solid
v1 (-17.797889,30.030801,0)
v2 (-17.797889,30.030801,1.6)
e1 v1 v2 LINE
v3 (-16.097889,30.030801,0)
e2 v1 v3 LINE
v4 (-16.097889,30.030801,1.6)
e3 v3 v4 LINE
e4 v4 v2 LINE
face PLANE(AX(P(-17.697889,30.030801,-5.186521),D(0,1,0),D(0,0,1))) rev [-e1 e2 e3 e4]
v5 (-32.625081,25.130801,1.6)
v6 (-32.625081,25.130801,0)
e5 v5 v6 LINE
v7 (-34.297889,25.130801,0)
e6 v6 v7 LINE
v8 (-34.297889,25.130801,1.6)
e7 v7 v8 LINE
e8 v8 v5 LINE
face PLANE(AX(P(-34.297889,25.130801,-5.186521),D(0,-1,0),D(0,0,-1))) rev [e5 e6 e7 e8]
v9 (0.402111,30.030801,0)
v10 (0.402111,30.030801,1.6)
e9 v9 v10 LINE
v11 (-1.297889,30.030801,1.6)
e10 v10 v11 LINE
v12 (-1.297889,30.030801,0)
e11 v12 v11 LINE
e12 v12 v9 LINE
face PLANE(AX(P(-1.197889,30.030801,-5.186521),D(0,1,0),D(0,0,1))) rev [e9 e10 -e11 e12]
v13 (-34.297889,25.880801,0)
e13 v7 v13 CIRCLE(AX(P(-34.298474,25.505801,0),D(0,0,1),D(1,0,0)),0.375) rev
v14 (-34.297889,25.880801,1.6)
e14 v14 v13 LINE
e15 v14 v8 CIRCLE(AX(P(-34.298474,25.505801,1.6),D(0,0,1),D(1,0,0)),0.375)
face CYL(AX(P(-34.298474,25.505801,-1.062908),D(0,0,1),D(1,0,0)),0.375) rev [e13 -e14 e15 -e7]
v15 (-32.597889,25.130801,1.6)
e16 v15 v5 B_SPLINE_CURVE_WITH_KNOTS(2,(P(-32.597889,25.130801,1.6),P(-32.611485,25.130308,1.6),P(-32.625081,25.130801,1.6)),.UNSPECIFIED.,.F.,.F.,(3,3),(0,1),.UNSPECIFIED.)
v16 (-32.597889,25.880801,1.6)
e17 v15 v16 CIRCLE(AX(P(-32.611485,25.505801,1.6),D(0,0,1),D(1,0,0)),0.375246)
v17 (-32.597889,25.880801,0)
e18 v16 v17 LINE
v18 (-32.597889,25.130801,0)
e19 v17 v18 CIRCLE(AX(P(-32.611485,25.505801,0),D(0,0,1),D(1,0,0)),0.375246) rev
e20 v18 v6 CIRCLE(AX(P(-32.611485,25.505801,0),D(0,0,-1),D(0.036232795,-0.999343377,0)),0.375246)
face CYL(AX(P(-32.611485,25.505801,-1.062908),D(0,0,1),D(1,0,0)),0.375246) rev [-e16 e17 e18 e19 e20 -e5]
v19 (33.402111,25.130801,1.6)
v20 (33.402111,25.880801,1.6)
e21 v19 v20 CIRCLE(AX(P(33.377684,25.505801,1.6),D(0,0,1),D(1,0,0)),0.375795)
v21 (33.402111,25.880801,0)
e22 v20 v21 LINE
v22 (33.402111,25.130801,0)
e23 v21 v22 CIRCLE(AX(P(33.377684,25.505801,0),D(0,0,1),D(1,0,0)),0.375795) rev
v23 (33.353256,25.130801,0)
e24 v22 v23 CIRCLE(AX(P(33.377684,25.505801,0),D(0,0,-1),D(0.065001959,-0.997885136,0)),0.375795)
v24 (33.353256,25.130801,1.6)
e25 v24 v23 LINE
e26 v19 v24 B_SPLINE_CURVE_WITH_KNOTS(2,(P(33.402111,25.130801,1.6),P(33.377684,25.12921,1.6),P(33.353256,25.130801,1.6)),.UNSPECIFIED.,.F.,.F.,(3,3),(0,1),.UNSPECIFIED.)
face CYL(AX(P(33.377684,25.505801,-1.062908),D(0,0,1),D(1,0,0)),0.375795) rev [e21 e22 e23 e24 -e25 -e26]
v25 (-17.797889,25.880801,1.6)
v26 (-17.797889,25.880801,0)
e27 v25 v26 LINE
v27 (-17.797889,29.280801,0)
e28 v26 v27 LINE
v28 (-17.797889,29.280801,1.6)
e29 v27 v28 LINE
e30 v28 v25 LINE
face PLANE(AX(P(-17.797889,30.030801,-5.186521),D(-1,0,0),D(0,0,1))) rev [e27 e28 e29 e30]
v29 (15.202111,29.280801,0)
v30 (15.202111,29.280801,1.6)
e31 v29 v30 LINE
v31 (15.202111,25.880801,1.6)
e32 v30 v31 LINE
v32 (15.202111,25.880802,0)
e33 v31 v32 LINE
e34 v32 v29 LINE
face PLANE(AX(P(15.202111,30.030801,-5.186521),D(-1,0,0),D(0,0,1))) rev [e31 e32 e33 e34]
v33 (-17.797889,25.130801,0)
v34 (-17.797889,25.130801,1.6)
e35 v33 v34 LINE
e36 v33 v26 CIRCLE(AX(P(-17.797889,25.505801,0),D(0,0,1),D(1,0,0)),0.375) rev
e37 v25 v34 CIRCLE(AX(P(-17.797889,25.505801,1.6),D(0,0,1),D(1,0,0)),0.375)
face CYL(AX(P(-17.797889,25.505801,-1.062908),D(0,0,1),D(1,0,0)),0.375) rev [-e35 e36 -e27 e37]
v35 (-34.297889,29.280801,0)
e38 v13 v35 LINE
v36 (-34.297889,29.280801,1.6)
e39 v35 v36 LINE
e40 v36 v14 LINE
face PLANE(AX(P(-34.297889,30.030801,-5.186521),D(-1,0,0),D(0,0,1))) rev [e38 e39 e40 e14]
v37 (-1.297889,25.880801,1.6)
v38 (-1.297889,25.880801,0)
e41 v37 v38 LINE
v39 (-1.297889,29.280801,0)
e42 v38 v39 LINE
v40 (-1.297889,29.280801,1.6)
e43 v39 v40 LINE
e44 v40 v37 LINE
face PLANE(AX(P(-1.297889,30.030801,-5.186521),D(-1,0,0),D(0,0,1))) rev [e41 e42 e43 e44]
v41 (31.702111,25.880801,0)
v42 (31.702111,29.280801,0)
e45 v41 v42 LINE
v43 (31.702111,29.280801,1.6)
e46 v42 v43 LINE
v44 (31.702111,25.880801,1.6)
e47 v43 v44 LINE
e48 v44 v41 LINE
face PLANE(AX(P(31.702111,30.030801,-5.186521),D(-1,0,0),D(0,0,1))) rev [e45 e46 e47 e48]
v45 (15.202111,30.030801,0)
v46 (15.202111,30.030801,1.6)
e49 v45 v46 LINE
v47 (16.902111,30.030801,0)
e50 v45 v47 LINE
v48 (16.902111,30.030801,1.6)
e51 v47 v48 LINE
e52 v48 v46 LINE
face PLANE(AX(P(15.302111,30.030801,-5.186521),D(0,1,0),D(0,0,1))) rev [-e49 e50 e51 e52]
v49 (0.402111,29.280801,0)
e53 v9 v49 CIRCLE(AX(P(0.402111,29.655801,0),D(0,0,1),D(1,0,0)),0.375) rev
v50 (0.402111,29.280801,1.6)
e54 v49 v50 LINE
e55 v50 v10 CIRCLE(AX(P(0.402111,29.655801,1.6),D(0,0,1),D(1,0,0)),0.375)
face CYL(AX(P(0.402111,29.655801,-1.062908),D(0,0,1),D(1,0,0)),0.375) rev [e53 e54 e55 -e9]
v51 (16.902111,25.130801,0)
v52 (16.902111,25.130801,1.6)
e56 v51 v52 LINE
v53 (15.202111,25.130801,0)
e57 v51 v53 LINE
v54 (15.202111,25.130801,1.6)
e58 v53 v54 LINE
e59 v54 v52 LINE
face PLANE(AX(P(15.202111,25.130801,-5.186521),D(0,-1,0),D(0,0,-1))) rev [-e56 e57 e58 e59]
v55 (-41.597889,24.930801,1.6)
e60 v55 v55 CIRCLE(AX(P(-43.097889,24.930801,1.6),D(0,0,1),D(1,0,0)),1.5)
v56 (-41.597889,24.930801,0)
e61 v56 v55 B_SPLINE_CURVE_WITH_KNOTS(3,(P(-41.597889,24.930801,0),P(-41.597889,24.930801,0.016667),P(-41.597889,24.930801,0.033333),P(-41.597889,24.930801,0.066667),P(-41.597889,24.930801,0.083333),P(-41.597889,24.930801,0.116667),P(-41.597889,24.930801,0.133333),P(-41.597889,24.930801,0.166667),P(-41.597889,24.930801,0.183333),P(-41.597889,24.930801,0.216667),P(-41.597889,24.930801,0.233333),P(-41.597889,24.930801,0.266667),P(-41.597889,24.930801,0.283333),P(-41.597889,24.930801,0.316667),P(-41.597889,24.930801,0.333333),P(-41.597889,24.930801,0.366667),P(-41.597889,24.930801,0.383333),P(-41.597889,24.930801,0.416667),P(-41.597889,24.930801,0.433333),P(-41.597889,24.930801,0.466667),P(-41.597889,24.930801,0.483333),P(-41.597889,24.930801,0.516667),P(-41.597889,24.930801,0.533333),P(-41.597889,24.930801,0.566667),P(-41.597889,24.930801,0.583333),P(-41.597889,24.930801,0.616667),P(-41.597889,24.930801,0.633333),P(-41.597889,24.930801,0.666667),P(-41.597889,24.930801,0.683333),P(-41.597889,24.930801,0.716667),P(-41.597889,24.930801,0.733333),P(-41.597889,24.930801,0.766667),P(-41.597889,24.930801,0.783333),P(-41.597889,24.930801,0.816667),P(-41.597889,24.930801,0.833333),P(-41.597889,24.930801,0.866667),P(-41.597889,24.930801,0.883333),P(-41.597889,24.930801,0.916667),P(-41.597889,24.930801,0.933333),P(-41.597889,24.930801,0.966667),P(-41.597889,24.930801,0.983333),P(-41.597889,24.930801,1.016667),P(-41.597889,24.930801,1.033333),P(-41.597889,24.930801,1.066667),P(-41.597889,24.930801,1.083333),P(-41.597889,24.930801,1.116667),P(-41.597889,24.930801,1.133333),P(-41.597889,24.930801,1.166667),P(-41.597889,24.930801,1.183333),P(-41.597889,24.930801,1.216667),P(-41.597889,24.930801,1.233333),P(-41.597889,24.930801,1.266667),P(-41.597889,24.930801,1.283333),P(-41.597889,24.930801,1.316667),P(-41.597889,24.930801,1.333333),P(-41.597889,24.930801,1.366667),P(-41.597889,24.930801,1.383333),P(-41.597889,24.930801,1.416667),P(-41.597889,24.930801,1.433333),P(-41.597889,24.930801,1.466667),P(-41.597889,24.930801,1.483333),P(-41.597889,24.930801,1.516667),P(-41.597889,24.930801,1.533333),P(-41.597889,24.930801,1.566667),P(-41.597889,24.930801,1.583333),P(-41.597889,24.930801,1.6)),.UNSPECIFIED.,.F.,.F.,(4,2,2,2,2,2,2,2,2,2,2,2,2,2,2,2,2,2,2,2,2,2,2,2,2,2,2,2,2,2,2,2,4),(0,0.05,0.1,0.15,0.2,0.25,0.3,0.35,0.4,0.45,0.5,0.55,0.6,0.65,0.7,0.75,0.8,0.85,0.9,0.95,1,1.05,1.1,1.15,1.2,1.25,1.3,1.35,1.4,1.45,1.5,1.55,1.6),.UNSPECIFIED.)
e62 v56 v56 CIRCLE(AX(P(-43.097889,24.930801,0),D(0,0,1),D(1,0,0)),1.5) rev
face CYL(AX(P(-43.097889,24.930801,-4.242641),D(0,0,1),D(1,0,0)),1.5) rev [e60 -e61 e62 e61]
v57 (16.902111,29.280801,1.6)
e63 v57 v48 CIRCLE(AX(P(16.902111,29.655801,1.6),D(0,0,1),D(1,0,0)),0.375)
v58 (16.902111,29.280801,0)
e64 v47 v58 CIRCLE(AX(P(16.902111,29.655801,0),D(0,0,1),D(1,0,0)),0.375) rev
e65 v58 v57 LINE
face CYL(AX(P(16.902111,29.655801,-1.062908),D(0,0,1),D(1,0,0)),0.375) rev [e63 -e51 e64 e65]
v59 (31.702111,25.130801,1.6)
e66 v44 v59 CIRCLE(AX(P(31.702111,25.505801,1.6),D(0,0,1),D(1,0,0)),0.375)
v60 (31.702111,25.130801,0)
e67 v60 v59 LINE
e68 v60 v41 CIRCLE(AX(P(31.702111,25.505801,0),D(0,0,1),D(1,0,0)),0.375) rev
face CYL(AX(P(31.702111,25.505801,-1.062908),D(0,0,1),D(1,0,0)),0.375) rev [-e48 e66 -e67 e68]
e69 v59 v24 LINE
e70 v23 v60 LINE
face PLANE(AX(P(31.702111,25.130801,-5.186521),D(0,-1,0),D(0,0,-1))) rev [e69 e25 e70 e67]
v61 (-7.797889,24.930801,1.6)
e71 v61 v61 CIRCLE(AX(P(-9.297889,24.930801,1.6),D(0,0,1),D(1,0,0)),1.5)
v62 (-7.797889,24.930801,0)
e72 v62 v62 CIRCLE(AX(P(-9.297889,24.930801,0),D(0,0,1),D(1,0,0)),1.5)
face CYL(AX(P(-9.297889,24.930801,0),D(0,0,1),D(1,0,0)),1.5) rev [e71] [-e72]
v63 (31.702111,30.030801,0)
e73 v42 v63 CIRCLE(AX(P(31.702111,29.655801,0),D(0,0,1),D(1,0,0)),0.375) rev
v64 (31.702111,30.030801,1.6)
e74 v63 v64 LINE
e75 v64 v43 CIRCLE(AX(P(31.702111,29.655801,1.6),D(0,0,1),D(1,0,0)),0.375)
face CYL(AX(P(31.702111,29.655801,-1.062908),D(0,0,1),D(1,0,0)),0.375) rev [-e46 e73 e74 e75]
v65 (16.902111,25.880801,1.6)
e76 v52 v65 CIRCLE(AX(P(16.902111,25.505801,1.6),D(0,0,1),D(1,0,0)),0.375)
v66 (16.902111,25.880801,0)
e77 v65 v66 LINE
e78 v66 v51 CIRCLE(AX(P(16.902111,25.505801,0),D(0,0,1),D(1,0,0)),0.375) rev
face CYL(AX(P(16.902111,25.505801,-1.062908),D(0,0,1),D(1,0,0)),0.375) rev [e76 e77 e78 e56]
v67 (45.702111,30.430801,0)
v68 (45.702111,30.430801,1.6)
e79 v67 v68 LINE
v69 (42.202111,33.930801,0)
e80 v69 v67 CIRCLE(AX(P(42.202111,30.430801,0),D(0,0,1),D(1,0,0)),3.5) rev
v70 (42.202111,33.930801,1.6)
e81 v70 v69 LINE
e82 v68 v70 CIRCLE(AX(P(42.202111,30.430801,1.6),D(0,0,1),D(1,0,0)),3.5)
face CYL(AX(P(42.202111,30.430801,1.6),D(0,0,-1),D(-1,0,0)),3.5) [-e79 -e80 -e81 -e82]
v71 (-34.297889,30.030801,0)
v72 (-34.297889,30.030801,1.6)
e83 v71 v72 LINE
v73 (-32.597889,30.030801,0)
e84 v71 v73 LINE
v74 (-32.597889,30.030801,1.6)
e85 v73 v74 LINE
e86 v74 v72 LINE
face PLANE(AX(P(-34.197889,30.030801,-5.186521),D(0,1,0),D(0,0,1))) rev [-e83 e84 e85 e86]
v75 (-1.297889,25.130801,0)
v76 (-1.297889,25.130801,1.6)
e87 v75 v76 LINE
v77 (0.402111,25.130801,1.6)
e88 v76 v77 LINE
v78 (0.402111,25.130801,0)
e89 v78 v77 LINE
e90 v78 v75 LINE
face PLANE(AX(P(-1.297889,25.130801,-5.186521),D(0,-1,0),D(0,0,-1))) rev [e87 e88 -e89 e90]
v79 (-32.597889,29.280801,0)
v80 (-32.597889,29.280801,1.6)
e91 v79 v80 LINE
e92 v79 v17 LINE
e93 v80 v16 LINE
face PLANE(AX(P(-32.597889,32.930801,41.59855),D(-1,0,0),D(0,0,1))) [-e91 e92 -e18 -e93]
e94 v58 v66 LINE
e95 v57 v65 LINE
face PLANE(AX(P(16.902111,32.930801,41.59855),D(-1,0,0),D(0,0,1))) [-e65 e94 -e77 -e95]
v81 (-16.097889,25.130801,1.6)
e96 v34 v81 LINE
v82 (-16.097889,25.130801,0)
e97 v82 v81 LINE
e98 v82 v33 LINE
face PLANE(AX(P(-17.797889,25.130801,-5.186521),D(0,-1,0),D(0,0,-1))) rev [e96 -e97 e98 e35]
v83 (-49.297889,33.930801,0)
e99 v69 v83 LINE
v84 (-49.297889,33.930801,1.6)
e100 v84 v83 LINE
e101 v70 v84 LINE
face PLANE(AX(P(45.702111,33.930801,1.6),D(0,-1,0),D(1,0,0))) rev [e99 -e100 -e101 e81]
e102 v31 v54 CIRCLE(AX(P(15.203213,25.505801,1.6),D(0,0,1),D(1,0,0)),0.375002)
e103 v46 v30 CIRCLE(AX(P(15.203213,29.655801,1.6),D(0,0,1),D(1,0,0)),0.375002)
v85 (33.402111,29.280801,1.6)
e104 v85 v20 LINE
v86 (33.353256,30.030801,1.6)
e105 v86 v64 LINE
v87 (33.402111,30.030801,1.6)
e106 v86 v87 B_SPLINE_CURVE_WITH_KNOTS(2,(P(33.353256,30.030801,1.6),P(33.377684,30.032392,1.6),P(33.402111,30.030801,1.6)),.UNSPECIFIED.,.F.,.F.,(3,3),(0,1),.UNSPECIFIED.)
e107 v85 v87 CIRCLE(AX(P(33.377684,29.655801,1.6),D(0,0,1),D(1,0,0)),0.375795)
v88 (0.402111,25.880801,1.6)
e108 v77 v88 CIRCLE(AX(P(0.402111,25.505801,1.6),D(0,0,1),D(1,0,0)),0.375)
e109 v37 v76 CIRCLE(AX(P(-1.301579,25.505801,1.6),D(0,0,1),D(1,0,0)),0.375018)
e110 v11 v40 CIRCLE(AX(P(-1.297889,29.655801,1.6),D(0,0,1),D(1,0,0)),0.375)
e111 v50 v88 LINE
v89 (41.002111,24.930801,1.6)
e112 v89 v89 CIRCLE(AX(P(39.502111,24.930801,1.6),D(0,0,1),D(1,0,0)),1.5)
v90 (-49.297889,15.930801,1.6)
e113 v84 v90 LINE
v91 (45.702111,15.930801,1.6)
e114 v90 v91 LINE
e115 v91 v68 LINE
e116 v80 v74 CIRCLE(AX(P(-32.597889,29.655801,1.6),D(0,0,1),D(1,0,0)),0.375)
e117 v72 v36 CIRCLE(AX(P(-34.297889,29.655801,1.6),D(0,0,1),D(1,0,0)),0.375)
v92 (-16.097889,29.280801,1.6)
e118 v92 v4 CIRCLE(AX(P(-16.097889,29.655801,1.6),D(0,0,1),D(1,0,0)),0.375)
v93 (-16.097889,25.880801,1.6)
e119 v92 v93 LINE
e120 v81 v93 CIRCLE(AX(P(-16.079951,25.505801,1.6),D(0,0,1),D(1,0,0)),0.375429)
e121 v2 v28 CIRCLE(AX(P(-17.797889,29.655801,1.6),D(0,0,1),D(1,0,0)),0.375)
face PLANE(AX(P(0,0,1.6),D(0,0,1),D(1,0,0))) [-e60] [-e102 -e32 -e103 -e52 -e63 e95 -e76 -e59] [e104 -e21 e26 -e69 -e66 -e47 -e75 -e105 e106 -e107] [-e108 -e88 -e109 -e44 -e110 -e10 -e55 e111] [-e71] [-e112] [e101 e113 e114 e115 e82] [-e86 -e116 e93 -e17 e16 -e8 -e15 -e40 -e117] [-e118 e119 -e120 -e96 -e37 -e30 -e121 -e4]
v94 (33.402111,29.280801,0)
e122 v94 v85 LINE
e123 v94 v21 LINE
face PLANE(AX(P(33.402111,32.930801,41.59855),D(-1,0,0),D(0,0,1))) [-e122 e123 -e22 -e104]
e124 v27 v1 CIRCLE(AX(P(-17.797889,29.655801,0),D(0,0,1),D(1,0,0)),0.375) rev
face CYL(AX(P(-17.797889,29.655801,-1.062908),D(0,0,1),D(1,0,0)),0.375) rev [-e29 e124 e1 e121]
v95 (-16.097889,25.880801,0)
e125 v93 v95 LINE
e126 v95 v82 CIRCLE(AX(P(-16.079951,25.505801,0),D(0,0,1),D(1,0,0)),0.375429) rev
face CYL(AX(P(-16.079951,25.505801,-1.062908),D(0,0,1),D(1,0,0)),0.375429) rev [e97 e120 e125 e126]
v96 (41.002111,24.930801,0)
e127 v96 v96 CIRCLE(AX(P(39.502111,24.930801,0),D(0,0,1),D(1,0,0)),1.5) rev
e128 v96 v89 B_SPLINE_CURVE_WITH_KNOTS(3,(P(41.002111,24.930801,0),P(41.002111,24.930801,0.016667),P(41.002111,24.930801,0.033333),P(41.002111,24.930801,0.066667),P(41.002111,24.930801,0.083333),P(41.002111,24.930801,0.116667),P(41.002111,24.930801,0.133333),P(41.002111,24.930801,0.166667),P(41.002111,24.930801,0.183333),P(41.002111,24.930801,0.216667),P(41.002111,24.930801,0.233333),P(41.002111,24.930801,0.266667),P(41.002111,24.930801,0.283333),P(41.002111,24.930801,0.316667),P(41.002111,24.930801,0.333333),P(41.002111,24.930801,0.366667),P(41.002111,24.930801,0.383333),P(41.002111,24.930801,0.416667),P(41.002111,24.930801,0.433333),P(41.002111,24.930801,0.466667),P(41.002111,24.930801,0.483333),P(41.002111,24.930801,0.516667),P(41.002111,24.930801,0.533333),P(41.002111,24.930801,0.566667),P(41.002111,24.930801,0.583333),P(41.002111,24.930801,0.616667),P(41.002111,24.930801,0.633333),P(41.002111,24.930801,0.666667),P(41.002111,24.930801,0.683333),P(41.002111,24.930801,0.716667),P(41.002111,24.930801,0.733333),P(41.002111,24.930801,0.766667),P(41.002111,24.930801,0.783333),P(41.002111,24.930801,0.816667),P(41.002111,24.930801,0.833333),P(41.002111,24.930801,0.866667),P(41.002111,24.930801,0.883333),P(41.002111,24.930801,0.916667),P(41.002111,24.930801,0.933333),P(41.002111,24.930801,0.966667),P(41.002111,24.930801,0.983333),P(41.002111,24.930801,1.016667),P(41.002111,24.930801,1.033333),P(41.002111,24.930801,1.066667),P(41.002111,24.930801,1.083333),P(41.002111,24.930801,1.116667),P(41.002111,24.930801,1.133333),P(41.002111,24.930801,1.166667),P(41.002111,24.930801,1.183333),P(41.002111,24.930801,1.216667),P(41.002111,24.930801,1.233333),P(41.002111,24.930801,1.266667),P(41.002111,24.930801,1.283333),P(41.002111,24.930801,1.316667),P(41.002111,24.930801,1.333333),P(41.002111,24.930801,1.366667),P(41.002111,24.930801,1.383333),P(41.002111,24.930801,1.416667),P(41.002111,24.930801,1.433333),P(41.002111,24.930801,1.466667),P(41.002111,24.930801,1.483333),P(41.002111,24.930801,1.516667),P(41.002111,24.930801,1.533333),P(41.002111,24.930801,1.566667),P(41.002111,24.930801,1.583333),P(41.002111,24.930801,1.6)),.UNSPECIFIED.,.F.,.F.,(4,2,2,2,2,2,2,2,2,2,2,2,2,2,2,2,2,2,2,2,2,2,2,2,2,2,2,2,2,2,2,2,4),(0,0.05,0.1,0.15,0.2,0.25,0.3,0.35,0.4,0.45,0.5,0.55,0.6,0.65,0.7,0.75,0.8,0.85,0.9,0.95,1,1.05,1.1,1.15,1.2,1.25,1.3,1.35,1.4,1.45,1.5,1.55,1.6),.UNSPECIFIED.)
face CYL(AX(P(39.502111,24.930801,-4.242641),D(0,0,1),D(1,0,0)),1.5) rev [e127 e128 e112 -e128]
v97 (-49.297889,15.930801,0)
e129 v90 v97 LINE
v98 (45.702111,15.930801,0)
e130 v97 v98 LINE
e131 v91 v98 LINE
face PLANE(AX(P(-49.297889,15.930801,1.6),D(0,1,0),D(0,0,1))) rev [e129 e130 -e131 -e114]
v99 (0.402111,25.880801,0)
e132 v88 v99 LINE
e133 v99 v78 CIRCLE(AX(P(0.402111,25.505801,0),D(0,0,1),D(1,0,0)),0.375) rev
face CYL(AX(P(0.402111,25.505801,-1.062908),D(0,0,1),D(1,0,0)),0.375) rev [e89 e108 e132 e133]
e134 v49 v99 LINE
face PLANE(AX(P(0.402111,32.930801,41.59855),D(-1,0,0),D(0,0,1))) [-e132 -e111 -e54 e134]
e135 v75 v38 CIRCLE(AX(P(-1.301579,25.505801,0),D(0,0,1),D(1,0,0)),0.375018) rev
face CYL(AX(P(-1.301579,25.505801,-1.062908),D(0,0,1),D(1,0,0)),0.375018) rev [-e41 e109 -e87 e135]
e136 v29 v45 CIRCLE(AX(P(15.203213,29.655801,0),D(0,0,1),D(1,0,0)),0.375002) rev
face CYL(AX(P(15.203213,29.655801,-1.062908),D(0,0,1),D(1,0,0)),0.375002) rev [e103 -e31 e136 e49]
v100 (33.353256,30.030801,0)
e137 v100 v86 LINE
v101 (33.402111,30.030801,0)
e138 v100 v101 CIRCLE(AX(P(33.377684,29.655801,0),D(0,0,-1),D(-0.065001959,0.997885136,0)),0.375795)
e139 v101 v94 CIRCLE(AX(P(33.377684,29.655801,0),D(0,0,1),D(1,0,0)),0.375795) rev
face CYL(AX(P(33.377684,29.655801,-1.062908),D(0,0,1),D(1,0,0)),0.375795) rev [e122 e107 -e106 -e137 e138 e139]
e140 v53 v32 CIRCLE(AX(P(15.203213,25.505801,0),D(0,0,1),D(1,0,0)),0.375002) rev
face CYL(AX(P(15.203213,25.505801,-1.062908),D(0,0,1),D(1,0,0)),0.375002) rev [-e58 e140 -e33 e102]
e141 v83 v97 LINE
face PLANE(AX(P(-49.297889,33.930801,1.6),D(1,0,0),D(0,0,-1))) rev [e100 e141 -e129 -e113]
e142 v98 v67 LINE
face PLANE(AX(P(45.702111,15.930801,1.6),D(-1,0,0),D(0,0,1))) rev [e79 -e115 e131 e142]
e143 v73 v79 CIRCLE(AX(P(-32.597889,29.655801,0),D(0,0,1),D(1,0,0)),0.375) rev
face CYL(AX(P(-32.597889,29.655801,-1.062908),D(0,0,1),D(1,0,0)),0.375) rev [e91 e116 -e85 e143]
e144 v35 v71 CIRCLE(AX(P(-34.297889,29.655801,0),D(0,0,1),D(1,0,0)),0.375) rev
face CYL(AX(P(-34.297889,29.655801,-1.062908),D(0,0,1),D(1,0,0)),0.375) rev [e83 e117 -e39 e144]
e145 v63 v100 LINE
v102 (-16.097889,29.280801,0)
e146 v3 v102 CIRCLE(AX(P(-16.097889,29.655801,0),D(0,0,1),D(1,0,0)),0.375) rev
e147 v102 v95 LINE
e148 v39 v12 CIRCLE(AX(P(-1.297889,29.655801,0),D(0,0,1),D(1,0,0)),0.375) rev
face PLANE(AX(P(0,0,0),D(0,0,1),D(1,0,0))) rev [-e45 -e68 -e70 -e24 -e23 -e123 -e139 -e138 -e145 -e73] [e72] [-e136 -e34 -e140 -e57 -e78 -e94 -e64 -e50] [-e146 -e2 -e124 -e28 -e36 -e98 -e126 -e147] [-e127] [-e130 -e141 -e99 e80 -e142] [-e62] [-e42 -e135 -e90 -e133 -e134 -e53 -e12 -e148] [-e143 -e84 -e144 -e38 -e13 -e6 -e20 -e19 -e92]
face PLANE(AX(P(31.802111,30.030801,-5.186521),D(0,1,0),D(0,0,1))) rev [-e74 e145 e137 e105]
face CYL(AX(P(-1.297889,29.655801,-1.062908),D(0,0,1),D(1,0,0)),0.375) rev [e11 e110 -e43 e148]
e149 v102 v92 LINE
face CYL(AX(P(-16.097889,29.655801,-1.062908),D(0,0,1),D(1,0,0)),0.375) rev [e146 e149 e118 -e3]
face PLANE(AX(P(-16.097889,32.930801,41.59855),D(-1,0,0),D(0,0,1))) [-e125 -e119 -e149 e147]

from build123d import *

# Parameters (mm, degrees)
SZKIC1_W                    = 95
SZKIC1_H                    = 18
DODANIE_WYCI_GNI_CIE1_DEPTH = 1.6
GNIAZDO1_START              = -34.197888829
GNIAZDO1_OUTLINE_W          = 4.7
GNIAZDO1_OUTLINE_H          = 1.6
GNIAZDO1_DEPTH              = 1.6
GNIAZDO1_START_2            = -17.697888829
GNIAZDO1_2_OUTLINE_W        = 4.7
GNIAZDO1_2_OUTLINE_H        = 1.6
GNIAZDO1_2_DEPTH            = 1.6
GNIAZDO1_START_3            = -1.197888829
GNIAZDO1_3_OUTLINE_W        = 4.7
GNIAZDO1_3_OUTLINE_H        = 1.6
GNIAZDO1_3_DEPTH            = 1.6
GNIAZDO1_START_4            = 15.302111171
GNIAZDO1_4_OUTLINE_W        = 4.7
GNIAZDO1_4_OUTLINE_H        = 1.6
GNIAZDO1_4_DEPTH            = 1.6
GNIAZDO1_START_5            = 31.802111171
GNIAZDO1_5_OUTLINE_W        = 4.7
GNIAZDO1_5_OUTLINE_H        = 1.6
GNIAZDO1_5_DEPTH            = 1.6
WYTNIJ_WYCI_GNI_CIE2_DEPTH  = 1.6
ZAOKR_GLENIE1_R             = 3.5
SZKIC37_R                   = 1.5
WYTNIJ_WYCI_GNI_CIE3_DEPTH  = 1.6
SZKIC38_R                   = 1.5
WYTNIJ_WYCI_GNI_CIE4_DEPTH  = 60.867696542
SZKIC39_R                   = 0.375000457
SZKIC39_R_2                 = 0.375246396
SZKIC39_R_3                 = 0.375
SZKIC39_R_4                 = 0.375428794
SZKIC39_R_5                 = 0.37501816
SZKIC39_R_6                 = 0.375001619
SZKIC39_R_7                 = 0.375794755
WYTNIJ_WYCI_GNI_CIE5_DEPTH  = 1.6


# Read off the part's stored shape, not the designer's step: Gniazdo1
with BuildPart() as part:
    # Szkic1 → Dodanie-wyciągnięcie1 (new body)
    with BuildSketch(Plane.XY):
        with Locations((-1.797888829, 24.930800849)):
            Rectangle(SZKIC1_W, SZKIC1_H)
    extrude(amount=DODANIE_WYCI_GNI_CIE1_DEPTH)

    # Gniazdo1 outline → Gniazdo1 (cut)
    with BuildSketch(Plane.YZ.offset(GNIAZDO1_START)):
        with Locations((27.580800849, 0.8)):
            Rectangle(GNIAZDO1_OUTLINE_W, GNIAZDO1_OUTLINE_H)
    extrude(amount=GNIAZDO1_DEPTH, mode=Mode.SUBTRACT)

    # Gniazdo1 2 outline → Gniazdo1 2 (cut)
    with BuildSketch(Plane.YZ.offset(GNIAZDO1_START_2)):
        with Locations((27.580800849, 0.8)):
            Rectangle(GNIAZDO1_2_OUTLINE_W, GNIAZDO1_2_OUTLINE_H)
    extrude(amount=GNIAZDO1_2_DEPTH, mode=Mode.SUBTRACT)

    # Gniazdo1 3 outline → Gniazdo1 3 (cut)
    with BuildSketch(Plane.YZ.offset(GNIAZDO1_START_3)):
        with Locations((27.580800849, 0.8)):
            Rectangle(GNIAZDO1_3_OUTLINE_W, GNIAZDO1_3_OUTLINE_H)
    extrude(amount=GNIAZDO1_3_DEPTH, mode=Mode.SUBTRACT)

    # Gniazdo1 4 outline → Gniazdo1 4 (cut)
    with BuildSketch(Plane.YZ.offset(GNIAZDO1_START_4)):
        with Locations((27.580800849, 0.8)):
            Rectangle(GNIAZDO1_4_OUTLINE_W, GNIAZDO1_4_OUTLINE_H)
    extrude(amount=GNIAZDO1_4_DEPTH, mode=Mode.SUBTRACT)

    # Gniazdo1 5 outline → Gniazdo1 5 (cut)
    with BuildSketch(Plane.YZ.offset(GNIAZDO1_START_5)):
        with Locations((27.580800849, 0.8)):
            Rectangle(GNIAZDO1_5_OUTLINE_W, GNIAZDO1_5_OUTLINE_H)
    extrude(amount=GNIAZDO1_5_DEPTH, mode=Mode.SUBTRACT)

    # Szkic35 → Wytnij-wyciągnięcie2 (cut)
    with BuildSketch(Plane.XY.offset(1.6)):
        Polygon((-34.297888829, 30.030800849), (-34.297888829, 25.130800849), (-32.597888829, 25.130800849), (-32.597888829, 30.030800849), (-34.197888829, 30.030800849), align=None)
        Polygon((-17.797888829, 30.030800849), (-17.797888829, 25.130800849), (-16.097888829, 25.130800849), (-16.097888829, 30.030800849), (-17.697888829, 30.030800849), align=None)
        Polygon((-1.297888829, 30.030800849), (-1.297888829, 25.130800849), (0.402111171, 25.130800849), (0.402111171, 30.030800849), (-1.197888829, 30.030800849), align=None)
        Polygon((15.202111171, 30.030800849), (15.202111171, 25.130800849), (16.902111171, 25.130800849), (16.902111171, 30.030800849), (15.302111171, 30.030800849), align=None)
        Polygon((31.702111171, 30.030800849), (31.702111171, 25.130800849), (33.402111171, 25.130800849), (33.402111171, 30.030800849), (31.802111171, 30.030800849), align=None)
    extrude(amount=-WYTNIJ_WYCI_GNI_CIE2_DEPTH, mode=Mode.SUBTRACT)

    # Zaokrąglenie1
    zaokr_glenie1_edges = [part.edges().sort_by_distance(p)[0] for p in [
        (45.702111171, 33.930800849, 0.8),
    ]]
    fillet(zaokr_glenie1_edges, radius=ZAOKR_GLENIE1_R)

    # Szkic37 → Wytnij-wyciągnięcie3 (cut)
    with BuildSketch(Plane.XY.offset(1.6)):
        with Locations((39.502111171, 24.930800849)):
            Circle(SZKIC37_R)
        with Locations((-43.097888829, 24.930800849)):
            Circle(SZKIC37_R)
    extrude(amount=-WYTNIJ_WYCI_GNI_CIE3_DEPTH, mode=Mode.SUBTRACT)

    # Szkic38 → Wytnij-wyciągnięcie4 (cut, through all)
    with BuildSketch(Plane.XY.offset(1.6)):
        with Locations((-9.297888829, 24.930800849)):
            Circle(SZKIC38_R)
    extrude(amount=-WYTNIJ_WYCI_GNI_CIE4_DEPTH, mode=Mode.SUBTRACT)

    # Szkic39 → Wytnij-wyciągnięcie5 (cut)
    with BuildSketch(Plane.XY.offset(1.6)):
        with Locations((-34.298474307, 25.505800849)):
            Circle(SZKIC39_R)
        with Locations((-32.611485055, 25.505800849)):
            Circle(SZKIC39_R_2)
        with Locations((-17.797888829, 25.505800849)):
            Circle(SZKIC39_R_3)
        with Locations((-16.079950616, 25.505800849)):
            Circle(SZKIC39_R_4)
        with Locations((-1.301579386, 25.505800849)):
            Circle(SZKIC39_R_5)
        with Locations((0.402111171, 25.505800849)):
            Circle(SZKIC39_R_3)
        with Locations((15.203212962, 25.505800849)):
            Circle(SZKIC39_R_6)
        with Locations((16.902111171, 25.505800849)):
            Circle(SZKIC39_R_3)
        with Locations((31.702111171, 25.505800849)):
            Circle(SZKIC39_R_3)
        with Locations((33.377683776, 25.505800849)):
            Circle(SZKIC39_R_7)
        with Locations((-34.297888829, 29.655800849)):
            Circle(SZKIC39_R_3)
        with Locations((-32.597888829, 29.655800849)):
            Circle(SZKIC39_R_3)
        with Locations((-17.797888829, 29.655800849)):
            Circle(SZKIC39_R_3)
        with Locations((-16.097888829, 29.655800849)):
            Circle(SZKIC39_R_3)
        with Locations((-1.297888829, 29.655800849)):
            Circle(SZKIC39_R_3)
        with Locations((0.402111171, 29.655800849)):
            Circle(SZKIC39_R_3)
        with Locations((15.203212962, 29.655800849)):
            Circle(SZKIC39_R_6)
        with Locations((16.902111171, 29.655800849)):
            Circle(SZKIC39_R_3)
        with Locations((31.702111171, 29.655800849)):
            Circle(SZKIC39_R_3)
        with Locations((33.377683776, 29.655800849)):
            Circle(SZKIC39_R_7)
    extrude(amount=-WYTNIJ_WYCI_GNI_CIE5_DEPTH, mode=Mode.SUBTRACT)


solid = part.part
